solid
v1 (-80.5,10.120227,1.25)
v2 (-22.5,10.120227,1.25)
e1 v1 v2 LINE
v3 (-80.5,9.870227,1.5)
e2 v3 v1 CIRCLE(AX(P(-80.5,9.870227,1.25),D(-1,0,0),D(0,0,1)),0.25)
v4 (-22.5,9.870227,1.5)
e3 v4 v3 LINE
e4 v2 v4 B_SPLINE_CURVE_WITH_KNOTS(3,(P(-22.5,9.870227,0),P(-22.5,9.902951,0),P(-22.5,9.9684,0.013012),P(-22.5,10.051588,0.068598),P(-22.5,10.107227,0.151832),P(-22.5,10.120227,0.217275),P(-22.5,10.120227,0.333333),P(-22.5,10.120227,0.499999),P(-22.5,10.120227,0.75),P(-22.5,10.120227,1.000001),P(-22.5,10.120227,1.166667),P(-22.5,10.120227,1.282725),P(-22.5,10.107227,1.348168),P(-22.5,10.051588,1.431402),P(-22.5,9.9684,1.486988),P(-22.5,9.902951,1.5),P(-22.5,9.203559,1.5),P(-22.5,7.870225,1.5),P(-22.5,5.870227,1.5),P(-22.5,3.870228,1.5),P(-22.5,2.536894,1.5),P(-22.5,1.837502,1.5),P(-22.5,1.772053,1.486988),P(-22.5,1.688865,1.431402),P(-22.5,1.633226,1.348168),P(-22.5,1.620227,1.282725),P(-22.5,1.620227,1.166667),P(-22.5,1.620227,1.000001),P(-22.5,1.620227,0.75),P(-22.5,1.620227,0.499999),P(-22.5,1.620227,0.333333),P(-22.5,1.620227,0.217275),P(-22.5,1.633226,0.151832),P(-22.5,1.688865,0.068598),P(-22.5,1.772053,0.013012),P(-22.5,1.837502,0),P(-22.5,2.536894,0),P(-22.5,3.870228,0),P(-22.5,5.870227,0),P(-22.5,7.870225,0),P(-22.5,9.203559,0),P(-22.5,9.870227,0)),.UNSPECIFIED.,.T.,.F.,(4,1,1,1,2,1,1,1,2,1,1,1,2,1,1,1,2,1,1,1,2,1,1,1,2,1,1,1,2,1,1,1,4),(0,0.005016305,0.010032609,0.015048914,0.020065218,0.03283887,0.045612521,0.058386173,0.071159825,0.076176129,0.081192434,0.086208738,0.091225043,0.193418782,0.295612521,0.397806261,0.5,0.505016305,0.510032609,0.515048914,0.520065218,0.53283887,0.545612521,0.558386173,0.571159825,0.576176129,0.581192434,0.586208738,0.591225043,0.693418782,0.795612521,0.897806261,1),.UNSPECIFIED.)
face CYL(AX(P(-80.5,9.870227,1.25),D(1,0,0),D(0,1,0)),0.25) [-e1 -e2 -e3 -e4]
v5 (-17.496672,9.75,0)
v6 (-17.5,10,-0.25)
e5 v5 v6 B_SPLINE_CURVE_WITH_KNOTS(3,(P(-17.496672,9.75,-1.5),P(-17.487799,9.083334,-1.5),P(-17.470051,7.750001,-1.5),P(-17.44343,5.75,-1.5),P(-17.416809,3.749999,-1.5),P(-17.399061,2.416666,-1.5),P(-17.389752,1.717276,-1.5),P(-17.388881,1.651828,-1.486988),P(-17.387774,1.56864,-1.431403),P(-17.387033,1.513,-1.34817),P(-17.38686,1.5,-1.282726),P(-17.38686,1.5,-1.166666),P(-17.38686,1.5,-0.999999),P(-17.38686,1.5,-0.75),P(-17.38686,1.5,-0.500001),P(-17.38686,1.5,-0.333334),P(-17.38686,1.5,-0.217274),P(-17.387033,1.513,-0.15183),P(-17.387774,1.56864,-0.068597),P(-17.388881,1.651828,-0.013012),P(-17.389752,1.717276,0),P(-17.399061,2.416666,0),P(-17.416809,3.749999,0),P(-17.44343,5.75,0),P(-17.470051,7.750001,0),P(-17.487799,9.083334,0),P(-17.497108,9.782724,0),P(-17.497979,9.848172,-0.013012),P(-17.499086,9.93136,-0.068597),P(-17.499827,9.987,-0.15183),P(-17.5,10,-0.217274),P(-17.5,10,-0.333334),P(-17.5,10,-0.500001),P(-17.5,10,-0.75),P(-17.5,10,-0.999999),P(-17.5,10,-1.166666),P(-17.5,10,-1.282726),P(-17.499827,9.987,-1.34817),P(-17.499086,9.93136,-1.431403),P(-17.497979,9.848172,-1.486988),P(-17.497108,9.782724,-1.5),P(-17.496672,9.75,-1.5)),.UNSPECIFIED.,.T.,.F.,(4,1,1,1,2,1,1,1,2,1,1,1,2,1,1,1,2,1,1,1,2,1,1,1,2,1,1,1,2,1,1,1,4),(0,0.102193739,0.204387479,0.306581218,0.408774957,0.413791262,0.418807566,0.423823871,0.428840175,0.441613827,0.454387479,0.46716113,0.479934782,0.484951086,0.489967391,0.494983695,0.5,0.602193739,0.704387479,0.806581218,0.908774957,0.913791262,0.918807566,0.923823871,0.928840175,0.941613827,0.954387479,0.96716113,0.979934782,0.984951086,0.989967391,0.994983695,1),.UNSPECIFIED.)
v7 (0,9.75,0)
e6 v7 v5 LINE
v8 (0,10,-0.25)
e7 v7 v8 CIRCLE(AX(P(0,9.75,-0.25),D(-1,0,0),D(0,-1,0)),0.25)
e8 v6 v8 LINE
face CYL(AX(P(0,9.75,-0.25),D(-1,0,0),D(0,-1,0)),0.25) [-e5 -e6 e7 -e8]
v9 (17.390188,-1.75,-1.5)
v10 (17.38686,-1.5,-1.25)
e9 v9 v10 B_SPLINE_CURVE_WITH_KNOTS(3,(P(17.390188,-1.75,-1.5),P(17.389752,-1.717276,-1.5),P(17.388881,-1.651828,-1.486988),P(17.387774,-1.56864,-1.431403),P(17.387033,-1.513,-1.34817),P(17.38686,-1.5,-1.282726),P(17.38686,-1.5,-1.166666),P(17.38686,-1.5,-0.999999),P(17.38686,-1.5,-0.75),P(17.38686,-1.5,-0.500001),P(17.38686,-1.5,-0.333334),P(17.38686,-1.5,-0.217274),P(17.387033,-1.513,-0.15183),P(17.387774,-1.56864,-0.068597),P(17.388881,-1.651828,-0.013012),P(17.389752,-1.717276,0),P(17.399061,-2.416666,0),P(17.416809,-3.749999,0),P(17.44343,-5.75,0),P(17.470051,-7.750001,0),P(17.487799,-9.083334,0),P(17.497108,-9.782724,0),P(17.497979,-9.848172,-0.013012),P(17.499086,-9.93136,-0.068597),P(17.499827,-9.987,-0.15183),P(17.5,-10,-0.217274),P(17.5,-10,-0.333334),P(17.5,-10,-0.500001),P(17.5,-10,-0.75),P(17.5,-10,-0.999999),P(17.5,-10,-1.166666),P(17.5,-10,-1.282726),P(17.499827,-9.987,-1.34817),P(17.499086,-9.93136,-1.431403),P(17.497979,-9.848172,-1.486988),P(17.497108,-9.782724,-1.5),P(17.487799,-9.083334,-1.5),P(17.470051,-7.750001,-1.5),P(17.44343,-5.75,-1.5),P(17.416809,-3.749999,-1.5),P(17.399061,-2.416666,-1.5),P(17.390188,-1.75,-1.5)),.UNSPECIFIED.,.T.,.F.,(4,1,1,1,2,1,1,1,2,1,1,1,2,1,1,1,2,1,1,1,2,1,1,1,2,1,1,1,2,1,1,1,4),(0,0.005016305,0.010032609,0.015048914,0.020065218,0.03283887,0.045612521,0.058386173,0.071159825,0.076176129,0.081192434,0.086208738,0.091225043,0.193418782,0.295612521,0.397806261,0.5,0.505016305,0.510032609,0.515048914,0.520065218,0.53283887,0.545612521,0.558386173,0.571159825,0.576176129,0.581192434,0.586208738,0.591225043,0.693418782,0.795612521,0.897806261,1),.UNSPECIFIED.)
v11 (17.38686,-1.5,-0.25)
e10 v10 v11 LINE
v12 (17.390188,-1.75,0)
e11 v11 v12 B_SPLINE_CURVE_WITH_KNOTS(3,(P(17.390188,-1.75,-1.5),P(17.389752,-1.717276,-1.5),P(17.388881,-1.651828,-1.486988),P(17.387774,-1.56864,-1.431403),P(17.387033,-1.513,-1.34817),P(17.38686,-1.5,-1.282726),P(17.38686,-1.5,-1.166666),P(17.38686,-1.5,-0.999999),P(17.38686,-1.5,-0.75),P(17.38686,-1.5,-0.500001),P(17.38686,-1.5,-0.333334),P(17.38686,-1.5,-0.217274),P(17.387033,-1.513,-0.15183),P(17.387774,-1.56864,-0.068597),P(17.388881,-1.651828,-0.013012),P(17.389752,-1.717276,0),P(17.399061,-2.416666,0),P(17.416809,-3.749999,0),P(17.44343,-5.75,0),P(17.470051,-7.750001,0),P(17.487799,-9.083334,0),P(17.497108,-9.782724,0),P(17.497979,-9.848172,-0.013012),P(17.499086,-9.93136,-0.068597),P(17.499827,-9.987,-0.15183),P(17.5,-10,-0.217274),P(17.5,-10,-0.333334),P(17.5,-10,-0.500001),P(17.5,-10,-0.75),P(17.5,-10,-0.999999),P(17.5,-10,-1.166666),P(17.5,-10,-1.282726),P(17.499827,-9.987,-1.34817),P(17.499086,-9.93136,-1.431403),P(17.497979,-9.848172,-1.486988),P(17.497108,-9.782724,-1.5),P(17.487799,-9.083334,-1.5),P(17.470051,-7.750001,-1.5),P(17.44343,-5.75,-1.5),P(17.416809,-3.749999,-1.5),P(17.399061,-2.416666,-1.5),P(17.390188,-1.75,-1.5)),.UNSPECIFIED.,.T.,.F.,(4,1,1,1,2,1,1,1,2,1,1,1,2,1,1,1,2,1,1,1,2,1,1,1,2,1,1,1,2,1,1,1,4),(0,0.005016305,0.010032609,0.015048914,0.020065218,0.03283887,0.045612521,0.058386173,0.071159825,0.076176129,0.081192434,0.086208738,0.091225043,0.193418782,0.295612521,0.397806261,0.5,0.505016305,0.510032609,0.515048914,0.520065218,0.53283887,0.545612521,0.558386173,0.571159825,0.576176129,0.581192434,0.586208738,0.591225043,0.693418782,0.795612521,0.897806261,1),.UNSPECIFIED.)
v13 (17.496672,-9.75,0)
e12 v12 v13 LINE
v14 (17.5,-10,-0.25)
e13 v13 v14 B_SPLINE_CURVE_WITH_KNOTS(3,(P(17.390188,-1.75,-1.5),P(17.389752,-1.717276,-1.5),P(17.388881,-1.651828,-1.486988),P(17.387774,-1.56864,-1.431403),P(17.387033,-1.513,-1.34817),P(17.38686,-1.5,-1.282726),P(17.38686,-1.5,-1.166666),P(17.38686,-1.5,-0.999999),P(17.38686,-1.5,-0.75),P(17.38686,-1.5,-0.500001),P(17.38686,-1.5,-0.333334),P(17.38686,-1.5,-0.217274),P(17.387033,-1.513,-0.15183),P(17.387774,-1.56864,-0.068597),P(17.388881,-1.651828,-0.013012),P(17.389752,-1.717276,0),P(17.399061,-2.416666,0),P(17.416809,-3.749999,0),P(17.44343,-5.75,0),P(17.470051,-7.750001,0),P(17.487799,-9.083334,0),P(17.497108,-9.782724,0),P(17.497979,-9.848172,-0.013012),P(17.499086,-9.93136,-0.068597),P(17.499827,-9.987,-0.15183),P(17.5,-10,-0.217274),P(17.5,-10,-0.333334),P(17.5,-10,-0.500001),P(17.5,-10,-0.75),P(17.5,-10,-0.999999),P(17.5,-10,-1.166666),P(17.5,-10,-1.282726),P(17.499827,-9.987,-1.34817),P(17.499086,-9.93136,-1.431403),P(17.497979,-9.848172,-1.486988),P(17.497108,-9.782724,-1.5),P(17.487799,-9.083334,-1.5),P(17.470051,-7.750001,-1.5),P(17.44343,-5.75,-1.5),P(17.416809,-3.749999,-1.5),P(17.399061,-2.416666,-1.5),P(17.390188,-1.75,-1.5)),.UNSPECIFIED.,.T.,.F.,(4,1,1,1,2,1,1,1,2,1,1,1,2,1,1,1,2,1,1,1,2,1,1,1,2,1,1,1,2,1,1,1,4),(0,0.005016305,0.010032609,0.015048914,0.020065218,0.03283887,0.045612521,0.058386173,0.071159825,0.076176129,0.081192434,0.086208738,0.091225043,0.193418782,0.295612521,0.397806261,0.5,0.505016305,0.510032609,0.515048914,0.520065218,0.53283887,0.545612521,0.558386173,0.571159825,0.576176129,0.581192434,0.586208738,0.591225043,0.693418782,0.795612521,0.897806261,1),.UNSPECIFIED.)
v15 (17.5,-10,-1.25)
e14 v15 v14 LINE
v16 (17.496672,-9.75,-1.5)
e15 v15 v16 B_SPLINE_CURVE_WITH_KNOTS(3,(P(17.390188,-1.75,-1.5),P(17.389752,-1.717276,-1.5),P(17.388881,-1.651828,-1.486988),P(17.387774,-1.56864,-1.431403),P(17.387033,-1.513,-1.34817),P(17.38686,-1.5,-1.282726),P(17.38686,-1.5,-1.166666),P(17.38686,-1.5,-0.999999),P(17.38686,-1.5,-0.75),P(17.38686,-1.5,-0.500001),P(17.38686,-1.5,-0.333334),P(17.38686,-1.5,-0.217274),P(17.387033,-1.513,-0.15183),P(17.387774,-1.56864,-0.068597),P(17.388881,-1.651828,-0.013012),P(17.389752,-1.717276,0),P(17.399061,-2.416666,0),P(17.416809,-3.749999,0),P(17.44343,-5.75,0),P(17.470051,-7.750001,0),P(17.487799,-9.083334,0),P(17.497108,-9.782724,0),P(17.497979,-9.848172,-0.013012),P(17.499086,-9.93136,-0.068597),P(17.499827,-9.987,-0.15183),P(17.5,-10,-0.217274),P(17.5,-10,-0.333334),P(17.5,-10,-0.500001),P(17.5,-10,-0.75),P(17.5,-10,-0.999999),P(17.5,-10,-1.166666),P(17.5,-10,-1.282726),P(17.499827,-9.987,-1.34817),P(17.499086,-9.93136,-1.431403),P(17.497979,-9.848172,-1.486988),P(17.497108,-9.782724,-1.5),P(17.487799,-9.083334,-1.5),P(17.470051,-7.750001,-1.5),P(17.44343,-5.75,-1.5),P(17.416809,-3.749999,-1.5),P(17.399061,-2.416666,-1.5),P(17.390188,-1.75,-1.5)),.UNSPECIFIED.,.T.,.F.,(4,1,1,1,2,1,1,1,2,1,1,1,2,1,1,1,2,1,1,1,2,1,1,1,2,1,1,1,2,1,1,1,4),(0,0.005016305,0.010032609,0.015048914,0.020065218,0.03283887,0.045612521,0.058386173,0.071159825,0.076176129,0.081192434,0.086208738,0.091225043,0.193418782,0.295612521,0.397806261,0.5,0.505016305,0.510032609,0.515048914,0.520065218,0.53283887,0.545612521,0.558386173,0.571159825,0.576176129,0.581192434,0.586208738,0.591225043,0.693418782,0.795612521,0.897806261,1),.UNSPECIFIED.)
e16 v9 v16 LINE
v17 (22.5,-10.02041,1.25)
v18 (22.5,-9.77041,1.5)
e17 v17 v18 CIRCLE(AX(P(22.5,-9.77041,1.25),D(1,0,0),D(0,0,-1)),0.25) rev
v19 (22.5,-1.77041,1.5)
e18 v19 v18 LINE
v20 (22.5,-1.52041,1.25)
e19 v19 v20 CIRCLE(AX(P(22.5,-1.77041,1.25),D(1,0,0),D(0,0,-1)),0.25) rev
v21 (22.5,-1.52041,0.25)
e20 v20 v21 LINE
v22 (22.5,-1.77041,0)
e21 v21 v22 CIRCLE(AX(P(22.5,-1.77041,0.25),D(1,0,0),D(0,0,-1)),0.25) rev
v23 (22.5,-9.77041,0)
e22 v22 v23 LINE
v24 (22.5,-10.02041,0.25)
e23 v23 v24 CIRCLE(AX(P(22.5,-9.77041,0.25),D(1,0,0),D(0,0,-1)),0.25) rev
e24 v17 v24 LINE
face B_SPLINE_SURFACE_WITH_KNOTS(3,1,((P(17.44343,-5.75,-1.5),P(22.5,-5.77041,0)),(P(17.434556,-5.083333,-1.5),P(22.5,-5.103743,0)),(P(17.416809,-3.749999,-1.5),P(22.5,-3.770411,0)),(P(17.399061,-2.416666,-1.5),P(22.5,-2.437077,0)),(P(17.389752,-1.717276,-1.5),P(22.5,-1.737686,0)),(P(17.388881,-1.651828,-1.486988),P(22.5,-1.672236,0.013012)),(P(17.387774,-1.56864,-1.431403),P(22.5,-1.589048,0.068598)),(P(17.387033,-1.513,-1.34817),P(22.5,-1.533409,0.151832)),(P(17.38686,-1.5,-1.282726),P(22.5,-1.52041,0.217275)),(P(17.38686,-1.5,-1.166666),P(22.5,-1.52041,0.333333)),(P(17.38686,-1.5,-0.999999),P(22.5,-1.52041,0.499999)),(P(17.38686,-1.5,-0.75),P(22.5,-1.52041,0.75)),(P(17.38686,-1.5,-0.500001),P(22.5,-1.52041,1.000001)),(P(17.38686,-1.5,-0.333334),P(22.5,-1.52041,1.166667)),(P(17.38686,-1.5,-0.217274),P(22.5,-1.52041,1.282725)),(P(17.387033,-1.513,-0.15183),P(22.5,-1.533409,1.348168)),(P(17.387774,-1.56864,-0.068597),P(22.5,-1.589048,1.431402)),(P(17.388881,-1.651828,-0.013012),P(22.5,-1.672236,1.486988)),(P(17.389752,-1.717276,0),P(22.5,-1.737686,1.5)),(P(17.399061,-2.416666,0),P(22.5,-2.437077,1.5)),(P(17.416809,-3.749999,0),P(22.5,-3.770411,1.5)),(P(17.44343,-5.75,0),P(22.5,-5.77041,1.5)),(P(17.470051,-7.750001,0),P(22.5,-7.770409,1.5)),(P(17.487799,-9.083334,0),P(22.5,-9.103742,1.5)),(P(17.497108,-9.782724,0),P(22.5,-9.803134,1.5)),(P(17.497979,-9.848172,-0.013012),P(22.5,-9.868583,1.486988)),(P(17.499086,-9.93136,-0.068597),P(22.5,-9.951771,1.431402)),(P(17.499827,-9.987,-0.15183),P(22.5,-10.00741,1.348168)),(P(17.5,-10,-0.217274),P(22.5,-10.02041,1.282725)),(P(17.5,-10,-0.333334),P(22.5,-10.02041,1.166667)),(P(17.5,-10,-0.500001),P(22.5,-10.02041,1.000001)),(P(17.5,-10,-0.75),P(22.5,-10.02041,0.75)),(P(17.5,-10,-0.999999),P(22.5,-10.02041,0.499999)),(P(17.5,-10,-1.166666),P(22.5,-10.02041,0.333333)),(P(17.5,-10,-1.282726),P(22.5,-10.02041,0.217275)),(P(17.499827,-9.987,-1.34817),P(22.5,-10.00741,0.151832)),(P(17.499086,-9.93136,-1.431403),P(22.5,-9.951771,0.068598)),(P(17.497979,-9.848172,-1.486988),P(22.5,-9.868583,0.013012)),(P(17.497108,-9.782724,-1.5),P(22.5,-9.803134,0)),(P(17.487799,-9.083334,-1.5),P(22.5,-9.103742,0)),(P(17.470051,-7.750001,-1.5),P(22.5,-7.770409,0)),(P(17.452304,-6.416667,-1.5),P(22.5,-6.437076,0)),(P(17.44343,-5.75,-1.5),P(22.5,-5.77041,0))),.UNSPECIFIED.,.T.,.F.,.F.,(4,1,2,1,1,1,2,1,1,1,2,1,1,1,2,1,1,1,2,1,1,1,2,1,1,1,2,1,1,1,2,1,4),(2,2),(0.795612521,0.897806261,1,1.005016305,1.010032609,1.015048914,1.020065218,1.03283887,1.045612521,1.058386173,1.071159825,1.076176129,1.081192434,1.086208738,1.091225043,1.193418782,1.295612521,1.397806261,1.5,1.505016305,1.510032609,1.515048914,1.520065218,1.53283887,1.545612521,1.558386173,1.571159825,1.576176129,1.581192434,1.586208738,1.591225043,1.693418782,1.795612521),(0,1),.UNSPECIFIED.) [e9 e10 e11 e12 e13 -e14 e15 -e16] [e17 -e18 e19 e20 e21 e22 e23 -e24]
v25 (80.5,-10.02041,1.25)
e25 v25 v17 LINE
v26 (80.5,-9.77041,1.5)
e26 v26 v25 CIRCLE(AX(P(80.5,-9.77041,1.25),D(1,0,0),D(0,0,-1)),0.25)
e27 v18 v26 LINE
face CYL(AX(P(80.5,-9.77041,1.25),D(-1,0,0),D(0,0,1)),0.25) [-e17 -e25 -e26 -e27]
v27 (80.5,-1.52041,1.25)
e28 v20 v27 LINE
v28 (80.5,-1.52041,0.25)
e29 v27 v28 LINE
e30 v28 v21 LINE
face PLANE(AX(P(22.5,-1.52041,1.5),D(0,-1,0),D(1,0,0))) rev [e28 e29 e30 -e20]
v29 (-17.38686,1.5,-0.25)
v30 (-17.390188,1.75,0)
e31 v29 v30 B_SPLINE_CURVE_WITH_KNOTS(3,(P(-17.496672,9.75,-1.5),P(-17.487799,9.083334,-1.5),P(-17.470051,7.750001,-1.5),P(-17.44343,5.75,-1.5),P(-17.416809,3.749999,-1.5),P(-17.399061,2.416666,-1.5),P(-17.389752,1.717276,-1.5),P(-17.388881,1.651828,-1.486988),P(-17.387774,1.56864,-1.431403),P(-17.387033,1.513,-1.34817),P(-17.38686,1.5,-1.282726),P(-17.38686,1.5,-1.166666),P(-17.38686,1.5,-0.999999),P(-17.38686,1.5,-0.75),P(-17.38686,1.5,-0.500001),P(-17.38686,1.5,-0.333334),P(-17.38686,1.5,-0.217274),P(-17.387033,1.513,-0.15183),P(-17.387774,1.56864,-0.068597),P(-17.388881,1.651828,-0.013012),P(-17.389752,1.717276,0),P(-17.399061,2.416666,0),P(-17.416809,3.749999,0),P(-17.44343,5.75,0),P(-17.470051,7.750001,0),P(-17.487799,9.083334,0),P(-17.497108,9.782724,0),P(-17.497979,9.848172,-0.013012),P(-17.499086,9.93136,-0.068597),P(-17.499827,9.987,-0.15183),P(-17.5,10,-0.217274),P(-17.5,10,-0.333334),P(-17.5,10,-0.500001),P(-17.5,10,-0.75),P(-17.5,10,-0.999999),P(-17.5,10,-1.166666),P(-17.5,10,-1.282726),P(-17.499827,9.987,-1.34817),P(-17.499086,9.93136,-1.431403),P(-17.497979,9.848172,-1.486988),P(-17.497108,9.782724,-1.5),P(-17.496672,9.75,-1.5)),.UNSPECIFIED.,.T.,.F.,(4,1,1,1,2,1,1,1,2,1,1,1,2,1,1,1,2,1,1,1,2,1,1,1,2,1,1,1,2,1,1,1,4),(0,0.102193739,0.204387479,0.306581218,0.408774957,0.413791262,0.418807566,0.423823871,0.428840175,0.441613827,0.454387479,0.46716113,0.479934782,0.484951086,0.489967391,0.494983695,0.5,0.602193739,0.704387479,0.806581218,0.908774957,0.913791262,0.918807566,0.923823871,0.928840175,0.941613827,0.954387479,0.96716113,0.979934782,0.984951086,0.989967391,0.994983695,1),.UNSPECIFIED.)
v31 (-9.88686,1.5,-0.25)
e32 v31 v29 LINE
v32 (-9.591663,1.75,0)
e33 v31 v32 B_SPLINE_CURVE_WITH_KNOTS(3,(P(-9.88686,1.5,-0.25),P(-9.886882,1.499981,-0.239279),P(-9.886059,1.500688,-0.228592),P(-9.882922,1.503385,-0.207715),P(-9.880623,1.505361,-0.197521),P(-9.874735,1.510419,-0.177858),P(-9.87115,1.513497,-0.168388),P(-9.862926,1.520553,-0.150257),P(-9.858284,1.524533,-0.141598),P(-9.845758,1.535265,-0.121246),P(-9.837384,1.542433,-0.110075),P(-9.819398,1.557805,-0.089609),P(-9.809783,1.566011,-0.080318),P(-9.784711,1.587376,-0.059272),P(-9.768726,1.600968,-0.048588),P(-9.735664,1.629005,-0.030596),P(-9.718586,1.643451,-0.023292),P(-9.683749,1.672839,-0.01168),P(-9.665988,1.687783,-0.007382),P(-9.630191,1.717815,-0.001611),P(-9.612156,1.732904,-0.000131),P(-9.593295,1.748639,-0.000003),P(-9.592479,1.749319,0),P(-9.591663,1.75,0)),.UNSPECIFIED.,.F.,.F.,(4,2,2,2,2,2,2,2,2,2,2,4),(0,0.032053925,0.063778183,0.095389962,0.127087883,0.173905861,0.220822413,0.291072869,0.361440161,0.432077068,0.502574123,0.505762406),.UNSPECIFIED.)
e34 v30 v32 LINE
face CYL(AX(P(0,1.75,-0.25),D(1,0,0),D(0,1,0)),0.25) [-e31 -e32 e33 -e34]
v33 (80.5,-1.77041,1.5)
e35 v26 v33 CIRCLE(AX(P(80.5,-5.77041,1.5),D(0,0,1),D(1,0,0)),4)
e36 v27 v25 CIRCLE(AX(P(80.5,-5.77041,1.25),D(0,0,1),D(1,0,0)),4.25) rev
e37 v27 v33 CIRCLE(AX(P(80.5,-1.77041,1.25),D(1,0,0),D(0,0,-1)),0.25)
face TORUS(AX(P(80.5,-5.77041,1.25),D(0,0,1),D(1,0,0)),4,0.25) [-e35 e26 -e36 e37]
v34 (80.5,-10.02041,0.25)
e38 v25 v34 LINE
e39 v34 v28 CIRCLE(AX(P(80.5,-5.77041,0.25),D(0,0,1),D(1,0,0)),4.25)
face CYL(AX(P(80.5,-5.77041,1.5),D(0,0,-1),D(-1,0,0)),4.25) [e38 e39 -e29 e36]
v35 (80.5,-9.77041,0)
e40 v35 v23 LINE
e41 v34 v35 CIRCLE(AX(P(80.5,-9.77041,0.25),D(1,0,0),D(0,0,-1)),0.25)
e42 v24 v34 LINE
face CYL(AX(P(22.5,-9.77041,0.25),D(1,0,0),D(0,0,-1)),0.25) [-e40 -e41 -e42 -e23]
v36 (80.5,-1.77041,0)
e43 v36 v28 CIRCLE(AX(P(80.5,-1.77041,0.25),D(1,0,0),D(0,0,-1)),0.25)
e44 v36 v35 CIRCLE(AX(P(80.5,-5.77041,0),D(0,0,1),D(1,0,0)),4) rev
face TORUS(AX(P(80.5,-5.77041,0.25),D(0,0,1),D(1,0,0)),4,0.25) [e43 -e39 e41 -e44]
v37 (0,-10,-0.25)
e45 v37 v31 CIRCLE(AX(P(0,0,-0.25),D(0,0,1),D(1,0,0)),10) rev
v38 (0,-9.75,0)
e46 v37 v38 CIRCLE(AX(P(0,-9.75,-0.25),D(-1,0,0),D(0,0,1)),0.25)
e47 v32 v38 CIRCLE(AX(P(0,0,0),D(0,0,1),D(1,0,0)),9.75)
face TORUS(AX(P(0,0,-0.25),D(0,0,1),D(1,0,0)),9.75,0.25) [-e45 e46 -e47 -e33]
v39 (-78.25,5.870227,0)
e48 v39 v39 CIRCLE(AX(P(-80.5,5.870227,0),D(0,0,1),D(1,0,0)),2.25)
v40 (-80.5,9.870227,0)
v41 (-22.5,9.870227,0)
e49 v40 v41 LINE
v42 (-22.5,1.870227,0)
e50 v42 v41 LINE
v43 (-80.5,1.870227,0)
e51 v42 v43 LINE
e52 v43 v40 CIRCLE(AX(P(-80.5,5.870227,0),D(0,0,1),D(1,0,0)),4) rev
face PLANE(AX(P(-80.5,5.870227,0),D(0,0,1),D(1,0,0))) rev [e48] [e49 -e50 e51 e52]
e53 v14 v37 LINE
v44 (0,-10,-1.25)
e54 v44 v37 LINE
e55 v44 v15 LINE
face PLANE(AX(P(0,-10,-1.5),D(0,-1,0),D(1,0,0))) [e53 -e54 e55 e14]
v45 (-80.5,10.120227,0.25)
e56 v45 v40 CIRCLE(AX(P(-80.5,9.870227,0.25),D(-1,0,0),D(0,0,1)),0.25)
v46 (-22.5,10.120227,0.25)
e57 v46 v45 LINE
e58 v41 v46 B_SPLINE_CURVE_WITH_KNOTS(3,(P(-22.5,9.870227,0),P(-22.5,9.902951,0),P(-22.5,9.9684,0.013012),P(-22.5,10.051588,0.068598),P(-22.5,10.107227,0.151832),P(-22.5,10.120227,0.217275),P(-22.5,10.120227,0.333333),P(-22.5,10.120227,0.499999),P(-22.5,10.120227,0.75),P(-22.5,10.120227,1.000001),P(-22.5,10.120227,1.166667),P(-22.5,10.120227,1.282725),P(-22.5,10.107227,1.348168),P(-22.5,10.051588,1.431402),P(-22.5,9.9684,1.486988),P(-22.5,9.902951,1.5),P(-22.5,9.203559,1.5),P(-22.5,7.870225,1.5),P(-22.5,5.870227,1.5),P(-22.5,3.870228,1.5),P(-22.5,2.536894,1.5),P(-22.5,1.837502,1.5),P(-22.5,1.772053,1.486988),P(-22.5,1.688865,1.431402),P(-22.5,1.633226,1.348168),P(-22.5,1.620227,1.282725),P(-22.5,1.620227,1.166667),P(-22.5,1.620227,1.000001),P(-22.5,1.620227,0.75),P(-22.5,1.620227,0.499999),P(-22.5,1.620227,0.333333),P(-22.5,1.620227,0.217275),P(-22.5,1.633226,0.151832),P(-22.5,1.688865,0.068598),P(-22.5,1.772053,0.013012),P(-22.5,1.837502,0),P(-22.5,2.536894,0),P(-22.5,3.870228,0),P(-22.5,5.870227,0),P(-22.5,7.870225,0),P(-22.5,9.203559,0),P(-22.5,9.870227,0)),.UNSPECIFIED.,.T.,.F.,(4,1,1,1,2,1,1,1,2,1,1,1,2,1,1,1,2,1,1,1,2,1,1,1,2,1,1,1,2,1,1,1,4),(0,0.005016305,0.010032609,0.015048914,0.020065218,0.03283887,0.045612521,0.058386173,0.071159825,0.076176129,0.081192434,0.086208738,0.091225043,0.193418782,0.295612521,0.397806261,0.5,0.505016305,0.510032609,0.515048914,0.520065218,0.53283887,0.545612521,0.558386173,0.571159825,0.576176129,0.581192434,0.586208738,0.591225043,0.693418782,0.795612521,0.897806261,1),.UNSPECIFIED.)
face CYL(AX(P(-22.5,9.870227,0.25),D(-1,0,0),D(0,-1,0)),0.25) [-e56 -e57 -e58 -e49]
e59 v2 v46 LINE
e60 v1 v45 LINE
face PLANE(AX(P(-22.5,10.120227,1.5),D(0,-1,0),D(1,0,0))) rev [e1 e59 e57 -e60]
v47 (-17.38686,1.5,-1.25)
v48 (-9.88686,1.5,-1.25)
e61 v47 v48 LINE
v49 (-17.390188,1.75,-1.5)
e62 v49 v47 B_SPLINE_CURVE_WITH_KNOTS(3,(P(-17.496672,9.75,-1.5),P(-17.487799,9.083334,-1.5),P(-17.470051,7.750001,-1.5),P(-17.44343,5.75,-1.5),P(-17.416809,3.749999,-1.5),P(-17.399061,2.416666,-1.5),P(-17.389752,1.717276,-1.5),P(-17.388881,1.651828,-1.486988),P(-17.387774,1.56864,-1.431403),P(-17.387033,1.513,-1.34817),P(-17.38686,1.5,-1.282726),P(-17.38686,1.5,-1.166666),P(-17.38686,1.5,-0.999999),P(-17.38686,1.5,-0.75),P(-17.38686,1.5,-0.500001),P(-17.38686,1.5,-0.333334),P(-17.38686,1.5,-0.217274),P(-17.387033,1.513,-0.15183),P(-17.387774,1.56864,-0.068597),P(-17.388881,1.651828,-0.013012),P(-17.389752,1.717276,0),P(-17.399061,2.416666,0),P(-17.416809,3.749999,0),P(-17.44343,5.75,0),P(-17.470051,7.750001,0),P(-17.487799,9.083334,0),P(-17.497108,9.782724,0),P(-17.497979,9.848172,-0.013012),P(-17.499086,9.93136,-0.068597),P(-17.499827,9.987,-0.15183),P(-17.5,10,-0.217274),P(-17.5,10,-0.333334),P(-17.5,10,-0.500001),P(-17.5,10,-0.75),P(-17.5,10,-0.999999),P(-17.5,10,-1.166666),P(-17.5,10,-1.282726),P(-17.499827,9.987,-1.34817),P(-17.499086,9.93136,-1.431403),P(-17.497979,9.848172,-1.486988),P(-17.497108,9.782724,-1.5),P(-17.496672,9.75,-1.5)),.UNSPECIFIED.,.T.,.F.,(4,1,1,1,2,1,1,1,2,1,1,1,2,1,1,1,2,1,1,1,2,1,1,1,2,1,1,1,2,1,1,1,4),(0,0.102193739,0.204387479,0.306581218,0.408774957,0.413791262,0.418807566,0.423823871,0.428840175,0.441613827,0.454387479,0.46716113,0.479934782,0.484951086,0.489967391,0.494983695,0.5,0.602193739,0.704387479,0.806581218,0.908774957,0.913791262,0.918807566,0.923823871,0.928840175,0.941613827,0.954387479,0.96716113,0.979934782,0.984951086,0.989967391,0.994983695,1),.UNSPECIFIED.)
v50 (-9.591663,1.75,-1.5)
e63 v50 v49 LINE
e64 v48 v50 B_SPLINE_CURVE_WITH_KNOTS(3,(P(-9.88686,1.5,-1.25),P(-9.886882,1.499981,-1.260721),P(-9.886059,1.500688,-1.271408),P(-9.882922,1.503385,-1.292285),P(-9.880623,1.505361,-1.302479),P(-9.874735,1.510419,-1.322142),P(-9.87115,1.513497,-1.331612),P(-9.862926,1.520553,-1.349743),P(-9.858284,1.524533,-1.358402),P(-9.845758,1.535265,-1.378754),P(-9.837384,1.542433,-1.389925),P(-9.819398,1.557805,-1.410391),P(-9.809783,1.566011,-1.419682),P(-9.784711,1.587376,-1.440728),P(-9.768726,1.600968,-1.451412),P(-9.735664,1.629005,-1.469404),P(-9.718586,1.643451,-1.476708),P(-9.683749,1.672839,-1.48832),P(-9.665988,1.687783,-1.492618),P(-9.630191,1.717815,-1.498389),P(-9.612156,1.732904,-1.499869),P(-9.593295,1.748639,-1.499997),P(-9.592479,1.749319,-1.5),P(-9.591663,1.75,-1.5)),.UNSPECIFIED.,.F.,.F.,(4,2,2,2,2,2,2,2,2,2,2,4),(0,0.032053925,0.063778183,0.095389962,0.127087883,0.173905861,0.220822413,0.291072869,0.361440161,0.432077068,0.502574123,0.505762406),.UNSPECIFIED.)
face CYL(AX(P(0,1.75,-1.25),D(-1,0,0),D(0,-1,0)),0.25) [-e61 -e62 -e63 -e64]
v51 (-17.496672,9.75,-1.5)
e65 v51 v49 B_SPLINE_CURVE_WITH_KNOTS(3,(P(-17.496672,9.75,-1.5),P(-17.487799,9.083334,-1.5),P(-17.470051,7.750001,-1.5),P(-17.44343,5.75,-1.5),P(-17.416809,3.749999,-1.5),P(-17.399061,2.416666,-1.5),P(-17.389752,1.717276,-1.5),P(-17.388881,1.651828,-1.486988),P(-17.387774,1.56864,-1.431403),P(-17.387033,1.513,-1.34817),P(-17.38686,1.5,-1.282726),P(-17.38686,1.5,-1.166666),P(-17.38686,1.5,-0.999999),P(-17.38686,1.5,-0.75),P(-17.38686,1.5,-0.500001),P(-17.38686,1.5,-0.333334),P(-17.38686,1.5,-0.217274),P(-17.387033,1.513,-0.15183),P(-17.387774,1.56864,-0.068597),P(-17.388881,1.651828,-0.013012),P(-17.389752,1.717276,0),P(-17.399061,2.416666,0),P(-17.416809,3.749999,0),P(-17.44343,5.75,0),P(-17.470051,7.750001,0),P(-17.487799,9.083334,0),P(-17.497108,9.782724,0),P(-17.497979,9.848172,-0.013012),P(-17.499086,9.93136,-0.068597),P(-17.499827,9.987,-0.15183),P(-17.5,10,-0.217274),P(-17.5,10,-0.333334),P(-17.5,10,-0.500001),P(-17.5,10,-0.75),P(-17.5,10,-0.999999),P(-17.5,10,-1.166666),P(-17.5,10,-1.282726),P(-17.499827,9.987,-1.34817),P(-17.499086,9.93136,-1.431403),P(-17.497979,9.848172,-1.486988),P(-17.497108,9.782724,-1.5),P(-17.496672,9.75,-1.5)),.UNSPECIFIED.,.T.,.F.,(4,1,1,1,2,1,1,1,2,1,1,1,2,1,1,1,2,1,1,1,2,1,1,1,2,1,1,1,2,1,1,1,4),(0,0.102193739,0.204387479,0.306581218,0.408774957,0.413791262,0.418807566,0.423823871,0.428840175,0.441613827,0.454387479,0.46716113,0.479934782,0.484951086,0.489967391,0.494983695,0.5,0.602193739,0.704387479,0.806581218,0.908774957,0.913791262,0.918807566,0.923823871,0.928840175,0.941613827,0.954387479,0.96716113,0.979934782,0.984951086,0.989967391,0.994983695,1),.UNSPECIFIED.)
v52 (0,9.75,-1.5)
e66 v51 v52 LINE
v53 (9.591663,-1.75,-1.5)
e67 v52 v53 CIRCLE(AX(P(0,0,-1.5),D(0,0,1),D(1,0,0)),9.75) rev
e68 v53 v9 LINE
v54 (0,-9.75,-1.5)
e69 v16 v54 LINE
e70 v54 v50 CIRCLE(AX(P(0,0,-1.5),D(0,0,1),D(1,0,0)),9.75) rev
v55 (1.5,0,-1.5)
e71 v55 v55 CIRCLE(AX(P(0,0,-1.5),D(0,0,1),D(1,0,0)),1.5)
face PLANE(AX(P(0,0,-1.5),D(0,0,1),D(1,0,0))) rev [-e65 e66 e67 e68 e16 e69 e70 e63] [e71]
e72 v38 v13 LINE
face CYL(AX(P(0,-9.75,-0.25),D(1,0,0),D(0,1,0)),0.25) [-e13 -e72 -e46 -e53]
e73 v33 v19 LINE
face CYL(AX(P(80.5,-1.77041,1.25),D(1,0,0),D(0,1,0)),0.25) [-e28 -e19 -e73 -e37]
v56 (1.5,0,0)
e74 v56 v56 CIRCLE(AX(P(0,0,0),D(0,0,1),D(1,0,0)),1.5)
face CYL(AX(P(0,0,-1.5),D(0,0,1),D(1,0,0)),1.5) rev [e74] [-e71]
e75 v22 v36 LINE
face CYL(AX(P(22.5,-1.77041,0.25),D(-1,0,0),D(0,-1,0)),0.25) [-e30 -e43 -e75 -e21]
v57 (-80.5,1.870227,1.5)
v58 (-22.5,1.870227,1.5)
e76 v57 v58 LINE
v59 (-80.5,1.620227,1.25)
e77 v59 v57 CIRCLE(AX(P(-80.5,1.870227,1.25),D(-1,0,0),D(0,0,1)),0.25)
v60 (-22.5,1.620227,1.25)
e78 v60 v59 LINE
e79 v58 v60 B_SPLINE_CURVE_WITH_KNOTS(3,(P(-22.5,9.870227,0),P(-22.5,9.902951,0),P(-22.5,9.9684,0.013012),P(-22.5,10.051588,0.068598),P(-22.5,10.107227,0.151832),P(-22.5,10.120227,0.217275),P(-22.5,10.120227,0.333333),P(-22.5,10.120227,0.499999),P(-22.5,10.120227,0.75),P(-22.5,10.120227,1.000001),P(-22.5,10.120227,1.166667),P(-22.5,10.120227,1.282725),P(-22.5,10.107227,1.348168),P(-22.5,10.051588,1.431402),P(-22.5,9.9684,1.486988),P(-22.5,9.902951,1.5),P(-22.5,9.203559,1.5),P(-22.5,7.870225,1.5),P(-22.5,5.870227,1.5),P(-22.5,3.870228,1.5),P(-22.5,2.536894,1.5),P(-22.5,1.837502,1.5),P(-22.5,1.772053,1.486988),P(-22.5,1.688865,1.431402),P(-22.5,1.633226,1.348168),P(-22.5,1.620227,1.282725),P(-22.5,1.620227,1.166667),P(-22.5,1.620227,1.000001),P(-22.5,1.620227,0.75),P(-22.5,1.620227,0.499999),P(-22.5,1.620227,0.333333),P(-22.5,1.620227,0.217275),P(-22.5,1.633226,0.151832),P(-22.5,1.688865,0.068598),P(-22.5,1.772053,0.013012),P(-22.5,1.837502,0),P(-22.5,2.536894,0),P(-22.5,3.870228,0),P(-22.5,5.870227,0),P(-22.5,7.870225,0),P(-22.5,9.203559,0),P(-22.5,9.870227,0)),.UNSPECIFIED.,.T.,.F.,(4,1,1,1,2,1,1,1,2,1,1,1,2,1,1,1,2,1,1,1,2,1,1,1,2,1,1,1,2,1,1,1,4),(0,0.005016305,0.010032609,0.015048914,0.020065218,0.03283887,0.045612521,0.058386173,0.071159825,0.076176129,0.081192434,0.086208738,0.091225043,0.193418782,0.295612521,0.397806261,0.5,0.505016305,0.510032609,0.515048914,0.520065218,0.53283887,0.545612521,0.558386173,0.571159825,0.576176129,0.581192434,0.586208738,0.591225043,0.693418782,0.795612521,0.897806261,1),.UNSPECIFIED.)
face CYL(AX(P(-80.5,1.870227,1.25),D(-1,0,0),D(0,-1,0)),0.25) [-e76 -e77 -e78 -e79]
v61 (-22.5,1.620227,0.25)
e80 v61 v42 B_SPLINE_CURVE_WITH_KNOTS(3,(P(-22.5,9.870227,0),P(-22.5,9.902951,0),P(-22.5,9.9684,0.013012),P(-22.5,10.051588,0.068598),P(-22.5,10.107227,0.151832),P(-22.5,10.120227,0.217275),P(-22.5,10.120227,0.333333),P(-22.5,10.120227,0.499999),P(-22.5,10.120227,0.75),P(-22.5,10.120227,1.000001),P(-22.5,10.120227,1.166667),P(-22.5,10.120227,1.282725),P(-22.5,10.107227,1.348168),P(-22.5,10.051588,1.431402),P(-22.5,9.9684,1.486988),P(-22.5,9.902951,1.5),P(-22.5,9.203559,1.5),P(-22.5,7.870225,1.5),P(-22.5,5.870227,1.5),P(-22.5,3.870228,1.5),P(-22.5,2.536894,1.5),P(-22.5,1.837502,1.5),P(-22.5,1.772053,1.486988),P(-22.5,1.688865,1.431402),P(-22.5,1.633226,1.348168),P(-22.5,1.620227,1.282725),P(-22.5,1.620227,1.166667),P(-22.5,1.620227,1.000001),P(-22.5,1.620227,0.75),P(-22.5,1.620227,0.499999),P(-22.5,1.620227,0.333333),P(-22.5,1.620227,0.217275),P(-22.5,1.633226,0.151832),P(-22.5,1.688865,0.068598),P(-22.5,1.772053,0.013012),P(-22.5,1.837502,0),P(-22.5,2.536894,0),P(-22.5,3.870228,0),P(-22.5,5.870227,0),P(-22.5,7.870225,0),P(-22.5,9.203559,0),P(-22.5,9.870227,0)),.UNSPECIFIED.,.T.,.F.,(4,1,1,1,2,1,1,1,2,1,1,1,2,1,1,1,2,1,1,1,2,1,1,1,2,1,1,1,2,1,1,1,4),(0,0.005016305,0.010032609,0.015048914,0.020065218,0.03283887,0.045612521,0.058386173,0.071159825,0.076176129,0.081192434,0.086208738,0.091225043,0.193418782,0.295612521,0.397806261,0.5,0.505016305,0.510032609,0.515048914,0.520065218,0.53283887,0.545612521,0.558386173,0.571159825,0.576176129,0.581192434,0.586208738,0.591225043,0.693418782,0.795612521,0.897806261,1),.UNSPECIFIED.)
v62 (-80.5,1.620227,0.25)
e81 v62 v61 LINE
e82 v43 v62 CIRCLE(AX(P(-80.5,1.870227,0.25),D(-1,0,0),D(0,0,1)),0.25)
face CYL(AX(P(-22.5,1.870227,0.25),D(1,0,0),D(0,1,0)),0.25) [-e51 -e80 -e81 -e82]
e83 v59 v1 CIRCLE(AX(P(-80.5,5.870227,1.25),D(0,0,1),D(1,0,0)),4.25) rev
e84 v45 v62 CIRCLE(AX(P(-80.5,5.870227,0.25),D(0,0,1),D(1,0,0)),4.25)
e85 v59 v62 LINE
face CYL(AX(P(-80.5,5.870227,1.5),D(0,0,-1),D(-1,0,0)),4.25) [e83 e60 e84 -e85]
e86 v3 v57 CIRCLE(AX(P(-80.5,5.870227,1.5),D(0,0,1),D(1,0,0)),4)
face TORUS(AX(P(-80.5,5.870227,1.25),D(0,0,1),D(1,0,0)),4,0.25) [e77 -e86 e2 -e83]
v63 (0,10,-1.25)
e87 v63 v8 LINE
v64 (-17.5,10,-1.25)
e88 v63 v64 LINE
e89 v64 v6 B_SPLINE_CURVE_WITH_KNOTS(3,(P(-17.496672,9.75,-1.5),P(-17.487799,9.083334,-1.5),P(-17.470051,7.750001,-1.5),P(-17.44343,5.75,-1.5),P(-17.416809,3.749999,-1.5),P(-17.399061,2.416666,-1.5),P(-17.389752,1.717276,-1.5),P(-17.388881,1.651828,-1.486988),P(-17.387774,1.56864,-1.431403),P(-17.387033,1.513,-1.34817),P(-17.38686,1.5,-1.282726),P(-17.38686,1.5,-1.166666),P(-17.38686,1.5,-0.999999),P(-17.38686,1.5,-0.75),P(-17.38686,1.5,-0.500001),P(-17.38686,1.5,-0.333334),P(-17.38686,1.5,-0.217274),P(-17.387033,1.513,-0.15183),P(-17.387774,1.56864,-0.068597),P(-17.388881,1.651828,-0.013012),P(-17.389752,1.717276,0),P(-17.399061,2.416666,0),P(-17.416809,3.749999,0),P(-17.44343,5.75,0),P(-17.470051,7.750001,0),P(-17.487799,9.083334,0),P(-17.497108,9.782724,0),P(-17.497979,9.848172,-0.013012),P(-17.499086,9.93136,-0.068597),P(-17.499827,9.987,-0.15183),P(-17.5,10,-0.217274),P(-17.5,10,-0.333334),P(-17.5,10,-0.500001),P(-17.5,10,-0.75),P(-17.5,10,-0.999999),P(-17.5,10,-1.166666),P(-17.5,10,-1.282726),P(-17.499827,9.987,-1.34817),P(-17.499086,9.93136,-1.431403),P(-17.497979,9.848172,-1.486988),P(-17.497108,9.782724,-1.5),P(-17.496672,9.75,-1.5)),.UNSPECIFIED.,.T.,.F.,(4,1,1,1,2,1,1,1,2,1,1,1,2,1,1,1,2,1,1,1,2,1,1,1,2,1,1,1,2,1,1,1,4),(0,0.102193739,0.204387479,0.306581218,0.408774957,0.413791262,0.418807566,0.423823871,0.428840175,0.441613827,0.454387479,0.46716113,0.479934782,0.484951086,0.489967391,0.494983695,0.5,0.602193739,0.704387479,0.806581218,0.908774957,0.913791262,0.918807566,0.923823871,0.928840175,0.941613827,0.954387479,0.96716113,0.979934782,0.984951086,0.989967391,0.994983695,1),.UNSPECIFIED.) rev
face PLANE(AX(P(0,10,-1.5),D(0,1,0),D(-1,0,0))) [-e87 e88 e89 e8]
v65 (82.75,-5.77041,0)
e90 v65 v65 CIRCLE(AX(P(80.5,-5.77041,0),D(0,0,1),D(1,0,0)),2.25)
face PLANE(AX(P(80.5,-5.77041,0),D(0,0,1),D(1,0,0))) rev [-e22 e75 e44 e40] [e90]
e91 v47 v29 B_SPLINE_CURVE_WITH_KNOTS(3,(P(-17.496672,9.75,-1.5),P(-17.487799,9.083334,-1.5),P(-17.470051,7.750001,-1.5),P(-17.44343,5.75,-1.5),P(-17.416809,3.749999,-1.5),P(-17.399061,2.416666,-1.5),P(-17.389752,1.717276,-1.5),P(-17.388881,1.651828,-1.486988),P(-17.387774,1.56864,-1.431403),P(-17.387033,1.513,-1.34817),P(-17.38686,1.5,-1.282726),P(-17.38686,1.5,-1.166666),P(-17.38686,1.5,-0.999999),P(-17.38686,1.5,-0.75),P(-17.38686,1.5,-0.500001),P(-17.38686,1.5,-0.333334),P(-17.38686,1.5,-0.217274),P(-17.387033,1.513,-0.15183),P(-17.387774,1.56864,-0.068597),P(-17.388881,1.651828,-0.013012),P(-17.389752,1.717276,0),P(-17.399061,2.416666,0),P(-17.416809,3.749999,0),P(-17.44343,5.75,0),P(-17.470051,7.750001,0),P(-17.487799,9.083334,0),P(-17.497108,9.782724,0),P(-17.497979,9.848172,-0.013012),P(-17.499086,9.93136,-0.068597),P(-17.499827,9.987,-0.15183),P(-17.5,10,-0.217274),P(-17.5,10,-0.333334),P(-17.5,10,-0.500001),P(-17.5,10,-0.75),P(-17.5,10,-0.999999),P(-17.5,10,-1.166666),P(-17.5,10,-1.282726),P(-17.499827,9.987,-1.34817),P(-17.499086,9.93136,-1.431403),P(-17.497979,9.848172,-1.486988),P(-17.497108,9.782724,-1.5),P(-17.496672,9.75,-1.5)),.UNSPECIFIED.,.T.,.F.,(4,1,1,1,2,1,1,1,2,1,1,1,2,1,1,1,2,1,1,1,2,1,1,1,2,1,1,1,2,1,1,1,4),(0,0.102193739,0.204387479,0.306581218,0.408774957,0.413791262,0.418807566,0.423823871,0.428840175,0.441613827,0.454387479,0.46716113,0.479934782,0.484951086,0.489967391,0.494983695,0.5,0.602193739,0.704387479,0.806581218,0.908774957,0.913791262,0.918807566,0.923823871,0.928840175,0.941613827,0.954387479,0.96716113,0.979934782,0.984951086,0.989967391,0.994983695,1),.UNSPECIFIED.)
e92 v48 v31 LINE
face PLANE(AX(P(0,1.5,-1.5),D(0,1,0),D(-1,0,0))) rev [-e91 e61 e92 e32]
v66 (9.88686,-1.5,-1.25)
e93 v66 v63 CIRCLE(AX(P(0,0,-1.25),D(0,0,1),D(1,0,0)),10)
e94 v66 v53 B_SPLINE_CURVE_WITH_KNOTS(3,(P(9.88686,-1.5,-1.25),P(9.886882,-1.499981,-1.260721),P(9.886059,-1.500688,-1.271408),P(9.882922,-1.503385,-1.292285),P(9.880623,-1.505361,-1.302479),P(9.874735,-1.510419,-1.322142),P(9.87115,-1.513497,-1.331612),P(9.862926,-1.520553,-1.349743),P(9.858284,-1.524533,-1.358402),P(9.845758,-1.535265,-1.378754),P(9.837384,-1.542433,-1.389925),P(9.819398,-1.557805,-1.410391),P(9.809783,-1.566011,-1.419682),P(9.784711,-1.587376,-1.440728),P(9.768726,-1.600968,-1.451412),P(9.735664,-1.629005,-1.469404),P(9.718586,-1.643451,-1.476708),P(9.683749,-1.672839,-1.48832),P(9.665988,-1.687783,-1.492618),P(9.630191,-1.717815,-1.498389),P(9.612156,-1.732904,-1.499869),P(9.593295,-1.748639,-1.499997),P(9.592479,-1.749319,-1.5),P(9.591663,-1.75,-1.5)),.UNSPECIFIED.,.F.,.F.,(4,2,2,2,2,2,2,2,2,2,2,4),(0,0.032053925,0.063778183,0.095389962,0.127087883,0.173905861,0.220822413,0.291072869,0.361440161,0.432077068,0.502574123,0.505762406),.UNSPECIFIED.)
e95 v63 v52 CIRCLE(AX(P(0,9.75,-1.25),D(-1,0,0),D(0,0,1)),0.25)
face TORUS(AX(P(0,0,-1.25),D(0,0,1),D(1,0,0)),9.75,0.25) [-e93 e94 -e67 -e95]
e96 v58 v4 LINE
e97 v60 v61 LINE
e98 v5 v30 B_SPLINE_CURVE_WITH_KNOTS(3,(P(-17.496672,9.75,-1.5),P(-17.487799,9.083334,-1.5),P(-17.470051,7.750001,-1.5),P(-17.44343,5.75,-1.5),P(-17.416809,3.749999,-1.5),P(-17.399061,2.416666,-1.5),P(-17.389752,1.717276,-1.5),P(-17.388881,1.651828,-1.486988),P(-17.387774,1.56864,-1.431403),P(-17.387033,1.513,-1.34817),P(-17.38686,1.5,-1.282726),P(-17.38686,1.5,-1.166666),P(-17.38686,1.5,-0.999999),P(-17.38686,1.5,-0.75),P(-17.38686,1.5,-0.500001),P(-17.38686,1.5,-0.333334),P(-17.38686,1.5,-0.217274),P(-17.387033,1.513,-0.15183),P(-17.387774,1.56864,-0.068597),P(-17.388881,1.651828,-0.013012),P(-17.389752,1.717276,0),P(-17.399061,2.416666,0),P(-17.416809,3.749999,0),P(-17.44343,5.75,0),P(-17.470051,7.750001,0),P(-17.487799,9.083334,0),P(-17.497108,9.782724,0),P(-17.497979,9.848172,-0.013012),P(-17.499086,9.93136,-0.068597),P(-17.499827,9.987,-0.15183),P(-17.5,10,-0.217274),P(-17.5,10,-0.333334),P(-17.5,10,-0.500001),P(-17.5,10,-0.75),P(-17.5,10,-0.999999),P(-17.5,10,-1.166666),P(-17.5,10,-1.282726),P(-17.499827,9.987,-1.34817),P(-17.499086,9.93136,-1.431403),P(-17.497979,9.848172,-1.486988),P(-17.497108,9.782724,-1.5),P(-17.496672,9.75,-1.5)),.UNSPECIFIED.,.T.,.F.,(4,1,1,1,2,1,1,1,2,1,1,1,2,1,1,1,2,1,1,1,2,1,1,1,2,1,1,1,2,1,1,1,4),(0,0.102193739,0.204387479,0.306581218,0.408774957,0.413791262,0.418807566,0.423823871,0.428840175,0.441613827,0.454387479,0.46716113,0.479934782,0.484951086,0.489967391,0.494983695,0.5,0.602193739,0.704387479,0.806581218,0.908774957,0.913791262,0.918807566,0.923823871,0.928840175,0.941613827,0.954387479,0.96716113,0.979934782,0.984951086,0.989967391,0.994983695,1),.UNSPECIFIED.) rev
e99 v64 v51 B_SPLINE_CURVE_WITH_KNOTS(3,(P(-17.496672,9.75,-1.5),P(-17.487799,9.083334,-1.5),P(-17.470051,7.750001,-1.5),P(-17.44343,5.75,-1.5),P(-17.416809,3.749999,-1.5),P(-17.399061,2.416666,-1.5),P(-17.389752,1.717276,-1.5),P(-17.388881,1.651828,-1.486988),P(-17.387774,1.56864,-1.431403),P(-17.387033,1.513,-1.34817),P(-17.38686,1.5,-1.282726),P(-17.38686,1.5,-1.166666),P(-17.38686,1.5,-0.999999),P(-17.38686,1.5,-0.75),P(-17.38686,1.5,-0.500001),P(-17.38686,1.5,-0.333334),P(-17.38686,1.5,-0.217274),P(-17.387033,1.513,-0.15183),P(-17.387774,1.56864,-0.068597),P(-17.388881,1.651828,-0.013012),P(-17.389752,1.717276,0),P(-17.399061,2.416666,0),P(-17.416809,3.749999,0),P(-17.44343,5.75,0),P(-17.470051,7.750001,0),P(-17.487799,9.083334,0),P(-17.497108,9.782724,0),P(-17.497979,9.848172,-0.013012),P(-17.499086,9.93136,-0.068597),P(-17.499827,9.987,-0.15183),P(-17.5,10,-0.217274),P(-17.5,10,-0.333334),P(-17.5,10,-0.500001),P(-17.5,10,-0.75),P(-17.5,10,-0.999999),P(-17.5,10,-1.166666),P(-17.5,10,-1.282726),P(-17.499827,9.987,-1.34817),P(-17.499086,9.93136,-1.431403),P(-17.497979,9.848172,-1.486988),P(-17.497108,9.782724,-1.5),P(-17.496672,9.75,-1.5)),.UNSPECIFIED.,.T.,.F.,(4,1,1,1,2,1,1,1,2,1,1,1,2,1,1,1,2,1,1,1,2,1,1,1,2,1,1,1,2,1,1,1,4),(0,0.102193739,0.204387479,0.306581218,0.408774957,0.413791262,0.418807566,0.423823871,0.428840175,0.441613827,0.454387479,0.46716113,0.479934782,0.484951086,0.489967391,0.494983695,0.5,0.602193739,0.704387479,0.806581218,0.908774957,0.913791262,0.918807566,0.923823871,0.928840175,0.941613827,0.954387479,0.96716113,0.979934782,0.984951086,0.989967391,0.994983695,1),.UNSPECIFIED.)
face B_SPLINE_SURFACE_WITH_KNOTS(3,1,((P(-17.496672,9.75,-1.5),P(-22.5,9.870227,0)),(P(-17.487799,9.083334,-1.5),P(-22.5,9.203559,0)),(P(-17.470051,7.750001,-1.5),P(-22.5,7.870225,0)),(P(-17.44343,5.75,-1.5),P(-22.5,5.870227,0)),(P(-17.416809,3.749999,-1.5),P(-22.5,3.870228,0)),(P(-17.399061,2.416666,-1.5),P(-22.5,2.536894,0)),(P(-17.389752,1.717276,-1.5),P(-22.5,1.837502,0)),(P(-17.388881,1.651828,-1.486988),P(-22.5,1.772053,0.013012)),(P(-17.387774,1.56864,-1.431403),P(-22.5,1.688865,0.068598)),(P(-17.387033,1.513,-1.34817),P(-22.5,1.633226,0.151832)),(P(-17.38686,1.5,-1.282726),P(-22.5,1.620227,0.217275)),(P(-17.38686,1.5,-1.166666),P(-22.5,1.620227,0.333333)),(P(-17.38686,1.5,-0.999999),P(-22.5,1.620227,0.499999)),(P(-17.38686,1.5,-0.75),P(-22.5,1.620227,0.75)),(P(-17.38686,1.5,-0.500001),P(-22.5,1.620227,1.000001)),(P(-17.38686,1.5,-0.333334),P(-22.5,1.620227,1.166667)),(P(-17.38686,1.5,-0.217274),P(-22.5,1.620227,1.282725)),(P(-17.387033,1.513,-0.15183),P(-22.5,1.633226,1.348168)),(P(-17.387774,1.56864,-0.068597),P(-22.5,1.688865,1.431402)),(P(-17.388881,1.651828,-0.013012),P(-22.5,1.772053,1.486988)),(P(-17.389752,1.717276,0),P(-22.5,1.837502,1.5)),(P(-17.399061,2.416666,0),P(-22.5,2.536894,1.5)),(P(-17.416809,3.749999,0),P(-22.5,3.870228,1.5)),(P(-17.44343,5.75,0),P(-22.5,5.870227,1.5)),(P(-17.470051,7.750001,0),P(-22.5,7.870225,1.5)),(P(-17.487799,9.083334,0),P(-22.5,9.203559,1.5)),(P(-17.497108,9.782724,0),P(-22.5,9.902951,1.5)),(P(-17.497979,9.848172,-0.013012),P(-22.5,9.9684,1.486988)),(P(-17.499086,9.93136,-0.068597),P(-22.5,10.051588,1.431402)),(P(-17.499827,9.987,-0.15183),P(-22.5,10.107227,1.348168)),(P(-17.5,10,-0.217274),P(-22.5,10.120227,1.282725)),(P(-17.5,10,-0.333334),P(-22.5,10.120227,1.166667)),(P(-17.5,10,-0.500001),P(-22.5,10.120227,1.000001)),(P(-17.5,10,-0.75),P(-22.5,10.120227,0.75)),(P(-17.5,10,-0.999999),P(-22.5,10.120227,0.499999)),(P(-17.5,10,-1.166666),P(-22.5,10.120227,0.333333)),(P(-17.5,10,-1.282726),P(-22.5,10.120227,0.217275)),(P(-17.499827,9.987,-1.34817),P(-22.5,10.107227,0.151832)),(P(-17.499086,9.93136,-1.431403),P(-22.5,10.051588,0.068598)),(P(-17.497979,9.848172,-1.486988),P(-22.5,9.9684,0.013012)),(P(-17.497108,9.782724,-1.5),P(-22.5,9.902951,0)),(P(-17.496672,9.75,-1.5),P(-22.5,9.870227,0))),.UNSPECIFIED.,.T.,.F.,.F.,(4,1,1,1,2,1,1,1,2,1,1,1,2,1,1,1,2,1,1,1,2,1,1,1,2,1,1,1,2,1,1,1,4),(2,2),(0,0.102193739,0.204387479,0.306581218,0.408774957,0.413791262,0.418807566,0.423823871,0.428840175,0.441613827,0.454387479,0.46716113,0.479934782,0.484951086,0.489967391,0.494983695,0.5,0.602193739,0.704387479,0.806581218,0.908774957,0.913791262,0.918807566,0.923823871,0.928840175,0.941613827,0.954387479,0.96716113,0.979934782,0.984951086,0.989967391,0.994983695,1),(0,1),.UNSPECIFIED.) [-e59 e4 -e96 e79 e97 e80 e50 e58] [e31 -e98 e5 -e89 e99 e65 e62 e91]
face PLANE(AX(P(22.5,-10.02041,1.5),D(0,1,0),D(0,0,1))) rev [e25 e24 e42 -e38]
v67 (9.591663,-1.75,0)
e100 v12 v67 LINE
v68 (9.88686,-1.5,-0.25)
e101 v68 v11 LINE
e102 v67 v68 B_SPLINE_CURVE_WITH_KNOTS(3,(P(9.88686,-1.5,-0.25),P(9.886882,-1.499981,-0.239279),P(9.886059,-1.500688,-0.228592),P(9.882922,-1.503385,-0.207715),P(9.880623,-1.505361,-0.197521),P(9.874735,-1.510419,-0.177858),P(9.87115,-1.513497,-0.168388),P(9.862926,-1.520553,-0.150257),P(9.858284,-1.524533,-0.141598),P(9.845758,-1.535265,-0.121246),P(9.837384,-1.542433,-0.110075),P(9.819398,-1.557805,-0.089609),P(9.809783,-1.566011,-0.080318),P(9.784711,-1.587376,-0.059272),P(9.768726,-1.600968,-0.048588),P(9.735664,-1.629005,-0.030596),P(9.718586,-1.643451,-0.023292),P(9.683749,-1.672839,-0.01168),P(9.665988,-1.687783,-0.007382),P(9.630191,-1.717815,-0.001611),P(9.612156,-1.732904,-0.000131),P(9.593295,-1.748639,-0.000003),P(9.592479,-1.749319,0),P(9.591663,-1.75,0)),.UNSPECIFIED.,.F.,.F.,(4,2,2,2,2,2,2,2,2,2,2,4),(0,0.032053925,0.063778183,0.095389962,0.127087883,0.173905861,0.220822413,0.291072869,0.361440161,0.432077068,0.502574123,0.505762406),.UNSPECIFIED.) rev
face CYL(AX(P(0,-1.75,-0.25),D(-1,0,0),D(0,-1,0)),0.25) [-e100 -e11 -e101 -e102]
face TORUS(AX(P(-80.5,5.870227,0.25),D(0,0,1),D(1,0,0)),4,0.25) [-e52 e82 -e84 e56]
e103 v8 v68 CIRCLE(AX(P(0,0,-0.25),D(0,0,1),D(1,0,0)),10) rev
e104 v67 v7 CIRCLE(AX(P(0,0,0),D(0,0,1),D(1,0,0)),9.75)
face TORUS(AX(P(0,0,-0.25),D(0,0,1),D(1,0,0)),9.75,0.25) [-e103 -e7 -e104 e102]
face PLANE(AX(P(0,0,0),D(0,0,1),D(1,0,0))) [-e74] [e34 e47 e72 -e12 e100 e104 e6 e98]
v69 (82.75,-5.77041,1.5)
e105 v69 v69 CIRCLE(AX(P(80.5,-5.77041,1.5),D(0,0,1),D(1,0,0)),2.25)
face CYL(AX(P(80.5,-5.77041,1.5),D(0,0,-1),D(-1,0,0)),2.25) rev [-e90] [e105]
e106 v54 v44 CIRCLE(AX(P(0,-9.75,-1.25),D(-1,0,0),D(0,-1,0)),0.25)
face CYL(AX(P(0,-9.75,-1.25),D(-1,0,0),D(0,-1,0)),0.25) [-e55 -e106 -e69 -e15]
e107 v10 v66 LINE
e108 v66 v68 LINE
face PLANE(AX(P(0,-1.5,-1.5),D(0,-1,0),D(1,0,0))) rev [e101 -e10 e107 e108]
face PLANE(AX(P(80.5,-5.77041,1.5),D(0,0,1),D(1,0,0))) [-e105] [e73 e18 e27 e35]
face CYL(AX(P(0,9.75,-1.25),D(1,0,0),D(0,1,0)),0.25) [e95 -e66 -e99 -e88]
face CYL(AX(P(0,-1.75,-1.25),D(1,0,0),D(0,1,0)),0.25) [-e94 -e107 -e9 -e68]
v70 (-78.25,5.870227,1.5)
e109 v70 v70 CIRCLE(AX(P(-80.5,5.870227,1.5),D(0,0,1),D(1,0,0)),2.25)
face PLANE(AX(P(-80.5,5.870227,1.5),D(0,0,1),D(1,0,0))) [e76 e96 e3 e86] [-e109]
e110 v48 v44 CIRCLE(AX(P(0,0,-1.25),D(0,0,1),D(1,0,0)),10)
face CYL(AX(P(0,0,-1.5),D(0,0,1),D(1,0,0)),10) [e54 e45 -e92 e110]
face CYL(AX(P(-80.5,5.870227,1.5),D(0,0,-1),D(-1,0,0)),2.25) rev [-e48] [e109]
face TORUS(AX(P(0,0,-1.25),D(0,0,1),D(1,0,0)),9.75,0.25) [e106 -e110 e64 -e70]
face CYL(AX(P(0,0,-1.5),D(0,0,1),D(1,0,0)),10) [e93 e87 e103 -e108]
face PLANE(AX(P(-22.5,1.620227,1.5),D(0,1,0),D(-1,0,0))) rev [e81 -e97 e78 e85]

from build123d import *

# Parameters (mm, degrees)
SKETCH1_R             = 1.5
BOSS_EXTRUDE1_DEPTH   = 1.5
SKETCH2_R             = 2.25
BOSS_EXTRUDE2_DEPTH   = 1.5
BOSS_EXTRUDE2_2_DEPTH = 1.5
FILLET12_R            = 0.25
FILLET13_R            = 0.25
FILLET14_R            = 0.25


with BuildPart() as part:
    # Sketch1 → Boss-Extrude1 (new body)
    with BuildSketch(Plane.XY):
        with BuildLine():
            Line((-17.5, 10), (-17.386859967, 1.5))
            Line((-17.386859967, 1.5), (-9.886859967, 1.5))
            ThreePointArc((-9.886859967, 1.5), (-7.582875444, -6.519202405), (0, -10))
            Line((0, -10), (17.5, -10))
            Line((17.5, -10), (17.386859967, -1.5))
            Line((17.386859967, -1.5), (9.886859967, -1.5))
            ThreePointArc((9.886859967, -1.5), (7.582875444, 6.519202405), (0, 10))
            Line((0, 10), (-17.5, 10))
        make_face()
        Circle(SKETCH1_R, mode=Mode.SUBTRACT)
    extrude(amount=-BOSS_EXTRUDE1_DEPTH)

    # Fillet13
    fillet13_edges = [part.edges().sort_by_distance(p)[0] for p in [
        (13.636859967, -1.5, 0),
        (-8.75, 10, -1.5),
        (8.75, -10, 0),
        (-7.582875444, -6.519202405, 0),
        (-13.636859967, 1.5, 0),
        (-8.75, 10, 0),
        (7.582875444, 6.519202405, 0),
        (-13.636859967, 1.5, -1.5),
        (-7.582875444, -6.519202405, -1.5),
        (8.75, -10, -1.5),
        (13.636859967, -1.5, -1.5),
        (7.582875444, 6.519202405, -1.5),
    ]]
    fillet(fillet13_edges, radius=FILLET13_R)



with BuildPart() as body_2:
    # Sketch2 → Boss-Extrude2 (new body)
    with BuildSketch(Plane.XY):
        with BuildLine():
            Line((22.5, -1.520409702), (80.5, -1.520409702))
            ThreePointArc((80.5, -1.520409702), (84.75, -5.770409702), (80.5, -10.020409702))
            Line((80.5, -10.020409702), (22.5, -10.020409702))
            Line((22.5, -10.020409702), (22.5, -1.520409702))
        make_face()
        with Locations((80.5, -5.770409702)):
            Circle(SKETCH2_R, mode=Mode.SUBTRACT)
    extrude(amount=BOSS_EXTRUDE2_DEPTH)

    # Fillet12
    fillet12_edges = [body_2.edges().sort_by_distance(p)[0] for p in [
        (84.75, -5.770409702, 1.5),
        (51.5, -1.520409702, 1.5),
        (51.5, -1.520409702, 0),
        (84.75, -5.770409702, 0),
        (51.5, -10.020409702, 0),
        (51.5, -10.020409702, 1.5),
    ]]
    fillet(fillet12_edges, radius=FILLET12_R)


with BuildPart() as body_3:
    # Sketch2 → Boss-Extrude2 2 (new body)
    with BuildSketch(Plane.XY):
        with BuildLine():
            Line((-22.5, 10.120226545), (-80.5, 10.120226545))
            ThreePointArc((-80.5, 10.120226545), (-84.75, 5.870226545), (-80.5, 1.620226545))
            Line((-80.5, 1.620226545), (-22.5, 1.620226545))
            Line((-22.5, 1.620226545), (-22.5, 10.120226545))
        make_face()
        with Locations((-80.5, 5.870226545)):
            Circle(SKETCH2_R, mode=Mode.SUBTRACT)
    extrude(amount=BOSS_EXTRUDE2_2_DEPTH)

    # Fillet14
    fillet14_edges = [body_3.edges().sort_by_distance(p)[0] for p in [
        (-51.5, 10.120226545, 0),
        (-84.75, 5.870226545, 0),
        (-51.5, 1.620226545, 0),
        (-51.5, 10.120226545, 1.5),
        (-84.75, 5.870226545, 1.5),
        (-51.5, 1.620226545, 1.5),
    ]]
    fillet(fillet14_edges, radius=FILLET14_R)


with BuildPart() as part_1:
    add(part.part)

    add(body_2.part)  # loft3 joins it to this body
    # loft from a face of the part (loft3)
    loft([part_1.faces().sort_by_distance((17.443429983, -5.75, -0.75))[0], part_1.faces().sort_by_distance((22.5, -5.770409702, 0.75))[0]])


    add(body_3.part)  # loft4 joins it to this body
    # loft from a face of the part (loft4)
    loft([part_1.faces().sort_by_distance((-17.443429983, 5.75, -0.75))[0], part_1.faces().sort_by_distance((-22.5, 5.870226545, 0.75))[0]])


solid = part_1.part
